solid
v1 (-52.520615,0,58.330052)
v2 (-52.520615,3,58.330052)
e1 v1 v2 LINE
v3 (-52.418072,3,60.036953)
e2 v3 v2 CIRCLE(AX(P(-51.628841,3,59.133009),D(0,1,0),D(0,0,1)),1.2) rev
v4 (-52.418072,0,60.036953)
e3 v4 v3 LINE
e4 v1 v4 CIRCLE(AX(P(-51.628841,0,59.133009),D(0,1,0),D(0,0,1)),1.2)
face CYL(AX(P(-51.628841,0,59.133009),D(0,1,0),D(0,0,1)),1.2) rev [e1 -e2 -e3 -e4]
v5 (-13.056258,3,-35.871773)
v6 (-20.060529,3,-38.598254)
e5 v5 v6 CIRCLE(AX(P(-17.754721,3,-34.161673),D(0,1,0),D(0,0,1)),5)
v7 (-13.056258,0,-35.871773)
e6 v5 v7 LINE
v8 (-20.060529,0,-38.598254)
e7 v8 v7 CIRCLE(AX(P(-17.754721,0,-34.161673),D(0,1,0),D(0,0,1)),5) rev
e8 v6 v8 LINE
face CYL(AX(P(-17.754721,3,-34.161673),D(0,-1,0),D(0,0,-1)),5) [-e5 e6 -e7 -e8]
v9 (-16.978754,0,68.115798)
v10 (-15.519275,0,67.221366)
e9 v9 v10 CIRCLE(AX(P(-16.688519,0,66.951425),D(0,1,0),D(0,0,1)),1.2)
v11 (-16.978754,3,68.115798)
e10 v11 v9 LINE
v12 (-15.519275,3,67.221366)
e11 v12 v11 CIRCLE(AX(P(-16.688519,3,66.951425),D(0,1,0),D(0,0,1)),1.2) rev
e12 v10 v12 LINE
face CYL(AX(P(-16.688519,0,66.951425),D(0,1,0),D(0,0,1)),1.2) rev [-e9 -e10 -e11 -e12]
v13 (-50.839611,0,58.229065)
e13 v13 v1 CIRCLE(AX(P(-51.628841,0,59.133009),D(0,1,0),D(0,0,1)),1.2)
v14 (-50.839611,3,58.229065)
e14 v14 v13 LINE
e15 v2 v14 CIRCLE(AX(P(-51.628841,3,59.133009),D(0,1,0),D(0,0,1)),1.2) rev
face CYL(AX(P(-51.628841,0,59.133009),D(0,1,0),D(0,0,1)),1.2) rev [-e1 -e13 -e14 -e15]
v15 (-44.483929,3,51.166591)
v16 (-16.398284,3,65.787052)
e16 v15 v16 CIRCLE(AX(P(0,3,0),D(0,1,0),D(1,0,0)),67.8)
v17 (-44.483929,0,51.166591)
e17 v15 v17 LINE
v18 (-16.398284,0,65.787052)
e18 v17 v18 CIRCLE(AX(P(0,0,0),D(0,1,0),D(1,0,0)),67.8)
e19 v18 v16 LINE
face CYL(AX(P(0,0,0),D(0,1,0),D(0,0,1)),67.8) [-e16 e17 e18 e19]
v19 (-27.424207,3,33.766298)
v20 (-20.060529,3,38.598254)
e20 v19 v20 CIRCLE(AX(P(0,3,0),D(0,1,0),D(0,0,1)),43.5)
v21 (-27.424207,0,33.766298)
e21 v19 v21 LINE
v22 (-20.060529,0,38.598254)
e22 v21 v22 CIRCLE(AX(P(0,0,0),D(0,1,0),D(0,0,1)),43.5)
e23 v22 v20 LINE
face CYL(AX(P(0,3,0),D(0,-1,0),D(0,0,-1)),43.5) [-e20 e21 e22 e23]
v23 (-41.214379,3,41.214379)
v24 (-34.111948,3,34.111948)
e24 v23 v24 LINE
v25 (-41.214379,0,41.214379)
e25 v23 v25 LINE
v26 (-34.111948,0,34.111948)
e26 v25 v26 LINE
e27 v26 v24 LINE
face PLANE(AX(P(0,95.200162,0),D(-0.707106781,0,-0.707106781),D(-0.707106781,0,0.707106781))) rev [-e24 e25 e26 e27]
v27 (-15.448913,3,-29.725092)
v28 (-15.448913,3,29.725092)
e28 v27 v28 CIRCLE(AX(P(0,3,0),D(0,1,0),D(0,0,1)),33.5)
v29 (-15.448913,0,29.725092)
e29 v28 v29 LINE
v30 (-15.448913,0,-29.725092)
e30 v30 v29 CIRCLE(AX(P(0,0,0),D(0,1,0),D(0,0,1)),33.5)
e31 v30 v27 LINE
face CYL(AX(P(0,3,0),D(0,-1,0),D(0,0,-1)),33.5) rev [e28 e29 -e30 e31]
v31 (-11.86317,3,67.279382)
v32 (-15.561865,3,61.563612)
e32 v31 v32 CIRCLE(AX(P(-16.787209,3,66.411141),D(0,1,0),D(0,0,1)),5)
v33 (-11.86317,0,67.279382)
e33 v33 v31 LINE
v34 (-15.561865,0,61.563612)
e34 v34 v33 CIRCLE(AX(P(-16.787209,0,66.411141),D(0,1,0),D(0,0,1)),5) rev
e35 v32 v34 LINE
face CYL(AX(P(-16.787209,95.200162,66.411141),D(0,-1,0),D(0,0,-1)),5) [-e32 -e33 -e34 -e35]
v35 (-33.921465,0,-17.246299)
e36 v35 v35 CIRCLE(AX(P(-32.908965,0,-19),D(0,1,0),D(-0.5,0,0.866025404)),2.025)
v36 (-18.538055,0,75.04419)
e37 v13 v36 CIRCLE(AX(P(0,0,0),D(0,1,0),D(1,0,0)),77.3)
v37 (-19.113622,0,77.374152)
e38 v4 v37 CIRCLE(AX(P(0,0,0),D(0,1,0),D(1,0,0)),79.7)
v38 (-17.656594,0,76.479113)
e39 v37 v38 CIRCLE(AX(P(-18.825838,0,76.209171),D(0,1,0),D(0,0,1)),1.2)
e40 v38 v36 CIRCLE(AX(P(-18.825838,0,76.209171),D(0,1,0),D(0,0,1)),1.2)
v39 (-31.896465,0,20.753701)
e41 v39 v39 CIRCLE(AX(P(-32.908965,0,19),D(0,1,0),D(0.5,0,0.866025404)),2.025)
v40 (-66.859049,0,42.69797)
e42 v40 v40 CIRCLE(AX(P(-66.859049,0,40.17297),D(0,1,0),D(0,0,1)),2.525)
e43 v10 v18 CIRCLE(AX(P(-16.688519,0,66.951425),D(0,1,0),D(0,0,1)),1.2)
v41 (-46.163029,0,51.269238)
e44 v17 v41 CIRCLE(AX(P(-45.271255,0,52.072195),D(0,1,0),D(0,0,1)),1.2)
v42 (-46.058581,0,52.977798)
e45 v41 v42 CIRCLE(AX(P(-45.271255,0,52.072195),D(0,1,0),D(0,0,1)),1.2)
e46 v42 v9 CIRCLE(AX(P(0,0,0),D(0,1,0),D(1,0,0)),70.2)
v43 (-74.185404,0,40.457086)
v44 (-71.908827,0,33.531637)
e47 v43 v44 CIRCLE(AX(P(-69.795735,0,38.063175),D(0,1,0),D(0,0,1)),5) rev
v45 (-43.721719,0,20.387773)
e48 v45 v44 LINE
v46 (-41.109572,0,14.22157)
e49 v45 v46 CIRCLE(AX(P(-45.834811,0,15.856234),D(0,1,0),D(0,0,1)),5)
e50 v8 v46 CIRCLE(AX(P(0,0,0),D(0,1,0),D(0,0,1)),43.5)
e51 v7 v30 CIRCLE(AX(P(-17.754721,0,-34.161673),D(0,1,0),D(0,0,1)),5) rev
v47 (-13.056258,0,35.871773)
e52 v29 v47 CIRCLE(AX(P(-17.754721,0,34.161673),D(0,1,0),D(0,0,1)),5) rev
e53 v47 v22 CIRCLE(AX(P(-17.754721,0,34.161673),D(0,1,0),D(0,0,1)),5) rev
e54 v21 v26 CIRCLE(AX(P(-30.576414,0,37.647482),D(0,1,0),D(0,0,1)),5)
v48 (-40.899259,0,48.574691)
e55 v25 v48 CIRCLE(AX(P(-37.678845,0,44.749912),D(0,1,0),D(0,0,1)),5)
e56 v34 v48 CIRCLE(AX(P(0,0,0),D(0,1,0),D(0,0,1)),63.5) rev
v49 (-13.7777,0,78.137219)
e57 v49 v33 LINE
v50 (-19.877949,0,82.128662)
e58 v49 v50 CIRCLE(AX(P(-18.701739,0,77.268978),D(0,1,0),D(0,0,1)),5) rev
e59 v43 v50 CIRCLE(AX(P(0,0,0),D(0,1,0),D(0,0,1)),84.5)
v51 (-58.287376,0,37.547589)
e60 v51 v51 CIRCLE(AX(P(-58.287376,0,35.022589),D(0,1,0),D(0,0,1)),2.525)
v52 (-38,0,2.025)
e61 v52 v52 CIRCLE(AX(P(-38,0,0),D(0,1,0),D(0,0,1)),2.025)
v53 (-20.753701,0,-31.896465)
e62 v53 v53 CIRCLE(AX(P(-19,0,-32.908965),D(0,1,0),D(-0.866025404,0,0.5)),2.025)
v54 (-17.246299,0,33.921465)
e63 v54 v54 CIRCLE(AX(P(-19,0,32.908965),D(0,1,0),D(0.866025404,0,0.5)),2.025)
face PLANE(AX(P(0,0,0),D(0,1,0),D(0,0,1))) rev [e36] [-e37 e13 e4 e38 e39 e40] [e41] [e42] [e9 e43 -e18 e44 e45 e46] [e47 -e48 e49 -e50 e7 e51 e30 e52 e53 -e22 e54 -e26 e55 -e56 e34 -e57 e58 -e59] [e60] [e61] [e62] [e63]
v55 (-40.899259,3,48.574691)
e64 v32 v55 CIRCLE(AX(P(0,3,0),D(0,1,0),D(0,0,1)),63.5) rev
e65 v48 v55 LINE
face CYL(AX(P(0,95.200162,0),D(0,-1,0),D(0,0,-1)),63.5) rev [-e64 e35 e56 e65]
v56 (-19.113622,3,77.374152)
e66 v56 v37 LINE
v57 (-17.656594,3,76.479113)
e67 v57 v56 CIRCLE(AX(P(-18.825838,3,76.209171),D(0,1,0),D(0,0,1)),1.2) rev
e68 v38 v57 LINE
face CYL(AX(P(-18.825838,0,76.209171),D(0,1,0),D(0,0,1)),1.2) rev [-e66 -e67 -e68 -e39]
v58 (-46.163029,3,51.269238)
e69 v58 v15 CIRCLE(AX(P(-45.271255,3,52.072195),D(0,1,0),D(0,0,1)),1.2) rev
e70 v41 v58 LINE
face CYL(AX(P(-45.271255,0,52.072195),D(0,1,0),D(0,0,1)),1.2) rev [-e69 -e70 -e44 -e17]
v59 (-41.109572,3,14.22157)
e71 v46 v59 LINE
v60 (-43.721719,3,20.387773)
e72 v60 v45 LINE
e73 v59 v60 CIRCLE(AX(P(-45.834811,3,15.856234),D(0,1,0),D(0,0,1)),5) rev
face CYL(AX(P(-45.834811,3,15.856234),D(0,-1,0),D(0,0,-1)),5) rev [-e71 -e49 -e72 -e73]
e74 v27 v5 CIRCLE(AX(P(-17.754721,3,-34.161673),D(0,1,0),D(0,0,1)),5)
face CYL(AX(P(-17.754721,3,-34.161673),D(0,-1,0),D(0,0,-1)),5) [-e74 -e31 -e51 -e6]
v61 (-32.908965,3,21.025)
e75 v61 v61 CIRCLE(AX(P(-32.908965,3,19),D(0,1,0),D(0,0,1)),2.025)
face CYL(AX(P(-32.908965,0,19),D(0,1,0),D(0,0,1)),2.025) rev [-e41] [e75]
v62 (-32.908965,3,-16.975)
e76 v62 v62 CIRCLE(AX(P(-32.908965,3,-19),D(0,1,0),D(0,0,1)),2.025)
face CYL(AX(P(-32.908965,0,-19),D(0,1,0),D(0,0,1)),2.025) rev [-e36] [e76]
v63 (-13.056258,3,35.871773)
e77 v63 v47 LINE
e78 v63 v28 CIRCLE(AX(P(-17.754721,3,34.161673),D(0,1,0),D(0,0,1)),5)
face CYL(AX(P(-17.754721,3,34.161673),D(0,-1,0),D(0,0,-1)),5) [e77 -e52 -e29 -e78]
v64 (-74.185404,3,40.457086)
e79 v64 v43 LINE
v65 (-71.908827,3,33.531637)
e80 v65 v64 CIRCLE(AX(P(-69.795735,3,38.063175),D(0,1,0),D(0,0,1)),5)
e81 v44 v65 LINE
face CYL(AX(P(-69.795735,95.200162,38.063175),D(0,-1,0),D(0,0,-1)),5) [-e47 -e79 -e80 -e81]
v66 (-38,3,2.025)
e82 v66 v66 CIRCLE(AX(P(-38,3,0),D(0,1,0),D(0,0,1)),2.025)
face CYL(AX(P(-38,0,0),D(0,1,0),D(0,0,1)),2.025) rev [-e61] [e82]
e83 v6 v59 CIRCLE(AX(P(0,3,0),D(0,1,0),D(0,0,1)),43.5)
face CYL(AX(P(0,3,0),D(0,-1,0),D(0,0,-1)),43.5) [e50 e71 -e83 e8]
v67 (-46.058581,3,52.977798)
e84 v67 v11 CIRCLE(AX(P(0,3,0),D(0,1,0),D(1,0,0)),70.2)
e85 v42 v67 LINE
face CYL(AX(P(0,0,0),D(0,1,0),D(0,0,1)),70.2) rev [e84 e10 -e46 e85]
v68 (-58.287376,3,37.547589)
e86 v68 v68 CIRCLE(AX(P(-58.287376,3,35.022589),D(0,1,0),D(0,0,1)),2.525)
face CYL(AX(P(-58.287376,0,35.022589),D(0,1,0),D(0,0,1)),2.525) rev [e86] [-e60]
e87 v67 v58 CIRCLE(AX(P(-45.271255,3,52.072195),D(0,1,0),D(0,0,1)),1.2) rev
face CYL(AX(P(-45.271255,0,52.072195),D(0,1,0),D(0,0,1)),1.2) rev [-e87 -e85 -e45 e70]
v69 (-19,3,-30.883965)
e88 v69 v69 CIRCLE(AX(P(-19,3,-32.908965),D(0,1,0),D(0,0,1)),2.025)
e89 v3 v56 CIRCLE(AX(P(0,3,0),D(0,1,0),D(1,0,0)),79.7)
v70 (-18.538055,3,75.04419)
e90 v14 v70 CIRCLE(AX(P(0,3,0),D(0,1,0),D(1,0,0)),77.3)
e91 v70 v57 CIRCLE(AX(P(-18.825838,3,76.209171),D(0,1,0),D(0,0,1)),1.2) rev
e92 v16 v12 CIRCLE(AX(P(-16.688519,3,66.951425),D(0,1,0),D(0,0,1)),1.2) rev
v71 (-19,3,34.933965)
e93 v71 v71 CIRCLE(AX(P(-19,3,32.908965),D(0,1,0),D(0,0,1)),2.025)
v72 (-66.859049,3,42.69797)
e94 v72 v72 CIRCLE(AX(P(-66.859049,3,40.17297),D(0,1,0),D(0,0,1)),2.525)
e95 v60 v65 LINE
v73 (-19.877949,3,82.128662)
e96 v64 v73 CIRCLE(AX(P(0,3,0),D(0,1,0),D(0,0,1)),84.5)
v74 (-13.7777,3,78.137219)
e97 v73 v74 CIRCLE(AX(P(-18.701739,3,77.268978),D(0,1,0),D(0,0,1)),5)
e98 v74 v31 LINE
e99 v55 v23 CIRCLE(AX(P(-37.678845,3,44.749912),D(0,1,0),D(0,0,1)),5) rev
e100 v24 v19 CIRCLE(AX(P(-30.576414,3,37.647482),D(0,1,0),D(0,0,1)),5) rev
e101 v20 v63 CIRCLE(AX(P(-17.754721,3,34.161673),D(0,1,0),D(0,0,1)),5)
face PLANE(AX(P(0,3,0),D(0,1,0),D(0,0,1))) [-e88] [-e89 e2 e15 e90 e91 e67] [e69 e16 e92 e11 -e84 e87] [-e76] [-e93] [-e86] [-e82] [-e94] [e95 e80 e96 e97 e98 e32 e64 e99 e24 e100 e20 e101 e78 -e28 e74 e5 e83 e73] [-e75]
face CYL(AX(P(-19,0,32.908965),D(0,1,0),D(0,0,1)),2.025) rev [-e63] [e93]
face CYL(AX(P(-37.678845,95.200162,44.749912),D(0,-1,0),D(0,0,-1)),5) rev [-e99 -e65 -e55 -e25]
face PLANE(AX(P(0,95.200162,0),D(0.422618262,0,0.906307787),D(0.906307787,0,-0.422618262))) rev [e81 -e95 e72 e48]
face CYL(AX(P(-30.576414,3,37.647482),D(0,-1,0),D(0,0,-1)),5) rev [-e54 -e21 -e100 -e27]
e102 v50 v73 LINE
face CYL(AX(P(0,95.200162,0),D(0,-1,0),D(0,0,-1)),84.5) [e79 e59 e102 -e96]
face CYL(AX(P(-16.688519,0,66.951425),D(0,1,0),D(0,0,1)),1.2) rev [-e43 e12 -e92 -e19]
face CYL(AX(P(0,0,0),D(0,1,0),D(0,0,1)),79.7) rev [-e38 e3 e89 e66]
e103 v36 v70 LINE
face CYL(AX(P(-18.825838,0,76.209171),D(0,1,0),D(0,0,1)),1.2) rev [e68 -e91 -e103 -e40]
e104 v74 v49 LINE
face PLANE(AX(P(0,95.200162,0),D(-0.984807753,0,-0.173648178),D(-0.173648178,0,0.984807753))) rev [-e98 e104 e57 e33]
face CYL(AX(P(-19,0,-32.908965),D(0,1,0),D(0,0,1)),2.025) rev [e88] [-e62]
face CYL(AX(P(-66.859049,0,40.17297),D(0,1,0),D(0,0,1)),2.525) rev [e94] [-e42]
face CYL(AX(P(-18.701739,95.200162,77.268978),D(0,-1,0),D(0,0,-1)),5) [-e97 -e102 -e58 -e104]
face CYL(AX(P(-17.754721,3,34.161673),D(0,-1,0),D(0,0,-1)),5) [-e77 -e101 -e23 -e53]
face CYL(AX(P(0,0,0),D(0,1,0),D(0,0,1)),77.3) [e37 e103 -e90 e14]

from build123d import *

# Parameters (mm, degrees)
SKETCH1_R               = 43.5
SKETCH1_R_2             = 33.5
BOSS_EXTRUDE1_DEPTH     = 3
SKETCH3_R               = 2.025
CUT_EXTRUDE2_DEPTH      = 62.591395503
CIRPATTERN1_COUNT       = 12
CUT_EXTRUDE1_DEPTH      = 62.591395503
BOSS_EXTRUDE2_DEPTH     = 3
CUT_EXTRUDE_THIN1_DEPTH = 3
FILLET1_R               = 1.2
FILLET2_R               = 5
CUT_EXTRUDE3_DEPTH      = 112.227677485
CUT_EXTRUDE3_DEPTH_BACK = 112.227677485
SKETCH6_R               = 2.525


with BuildPart() as part:
    # Sketch1 → Boss-Extrude1 (new body)
    with BuildSketch(Plane(origin=(0, 0, 0), x_dir=(1, 0, 0), z_dir=(0, 1, 0))):
        with Locations(Location((0, 0, 0), (0, 0, 270))):
            Circle(SKETCH1_R)
        with Locations(Location((0, 0, 0), (0, 0, 270))):
            Circle(SKETCH1_R_2, mode=Mode.SUBTRACT)
    extrude(amount=BOSS_EXTRUDE1_DEPTH)

    # Sketch3 → Cut-Extrude2 (cut, symmetric)
    with BuildSketch(Plane(origin=(0, 3, 0), x_dir=(1, 0, 0), z_dir=(0, 1, 0))):
        with Locations(Location((-38, 0, 0), (0, 0, 270))):
            Circle(SKETCH3_R)
    cut_extrude2 = extrude(amount=CUT_EXTRUDE2_DEPTH, both=True, mode=Mode.SUBTRACT)

    # CirPattern1: Cut-Extrude2 ×12 about axis
    cirpattern1_axis = Axis((0, 0, 0), (0, 1, 0))
    for i in range(1, CIRPATTERN1_COUNT):
        add(cut_extrude2.rotate(cirpattern1_axis, i * 360 / CIRPATTERN1_COUNT), mode=Mode.SUBTRACT)

    # Sketch2 → Cut-Extrude1 (cut, symmetric)
    with BuildSketch(Plane(origin=(0, 3, 0), x_dir=(1, 0, 0), z_dir=(0, 1, 0))):
        with BuildLine():
            Line((0, 0), (43.5, 0))
            ThreePointArc((43.5, 0), (24.950574981, -35.633113927), (-14.877876235, -40.876629004))
            Line((-14.877876235, -40.876629004), (0, 0))
        make_face()
    cut_extrude1 = extrude(amount=CUT_EXTRUDE1_DEPTH, both=True, mode=Mode.SUBTRACT)

    # Mirror1: Cut-Extrude1 across plane
    add(cut_extrude1.mirror(Plane.XY), mode=Mode.SUBTRACT)

    # Sketch4 → Boss-Extrude2 (add)
    with BuildSketch(Plane(origin=(0, 0, 0), x_dir=(1, 0, 0), z_dir=(0, 1, 0))):
        with BuildLine():
            ThreePointArc((-30.759144982, -30.759144982), (-35.633113927, -24.950574981), (-39.424388736, -18.383894386))
            Line((-39.424388736, -18.383894386), (-57.550544477, -26.836259621))
            Line((-57.550544477, -26.836259621), (-76.583008005, -35.711243117))
            ThreePointArc((-76.583008005, -35.711243117), (-51.440340751, -67.038357255), (-14.673271013, -83.21625513))
            Line((-14.673271013, -83.21625513), (-11.026659282, -62.535292316))
            ThreePointArc((-11.026659282, -62.535292316), (-29.32103694, -56.325187907), (-44.901280605, -44.901280605))
            Line((-44.901280605, -44.901280605), (-30.759144982, -30.759144982))
        make_face()
    extrude(amount=BOSS_EXTRUDE2_DEPTH)

    # Sketch5 → Cut-Extrude-Thin1 (cut)
    with BuildSketch(Plane(origin=(0, 3, 0), x_dir=(1, 0, 0), z_dir=(0, 1, 0))):
        with BuildLine():
            ThreePointArc((-46.972968566, -52.168766749), (-32.414752649, -62.268160489), (-15.791564015, -68.400778548))
            Line((-15.791564015, -68.400778548), (-15.251681485, -66.062290392))
            ThreePointArc((-15.251681485, -66.062290392), (-31.306555977, -60.139334489), (-45.367055111, -50.385219167))
            Line((-45.367055111, -50.385219167), (-46.972968566, -52.168766749))
        make_face()
        with BuildLine():
            ThreePointArc((-53.329709327, -59.228642591), (-36.801364475, -70.694763404), (-17.928599031, -77.657294163))
            Line((-17.928599031, -77.657294163), (-17.388716501, -75.318806008))
            ThreePointArc((-17.388716501, -75.318806008), (-35.693167803, -68.565937405), (-51.723795872, -57.445095009))
            Line((-51.723795872, -57.445095009), (-53.329709327, -59.228642591))
        make_face()
    extrude(amount=-CUT_EXTRUDE_THIN1_DEPTH, mode=Mode.SUBTRACT)

    # Fillet1
    fillet1_edges = [part.edges().sort_by_distance(p)[0] for p in [
        (-46.972968566, 1.5, 52.168766749),
        (-53.329709327, 1.5, 59.228642591),
        (-45.367055111, 1.5, 50.385219167),
        (-51.723795872, 1.5, 57.445095009),
        (-15.251681485, 1.5, 66.062290392),
        (-17.388716501, 1.5, 75.318806008),
        (-15.791564015, 1.5, 68.400778548),
        (-17.928599031, 1.5, 77.657294163),
    ]]
    fillet(fillet1_edges, radius=FILLET1_R - 0.0001)  # a hair under: the kernel refuses the full size

    # Fillet2
    fillet2_edges = [part.edges().sort_by_distance(p)[0] for p in [
        (-14.877876235, 1.5, -40.876629004),
        (-11.457674801, 1.5, -31.479702796),
        (-11.457674801, 1.5, 31.479702796),
        (-14.877876235, 1.5, 40.876629004),
        (-39.424388736, 1.5, 18.383894386),
        (-76.583008005, 1.5, 35.711243117),
        (-14.673271013, 1.5, 83.21625513),
        (-11.026659282, 1.5, 62.535292316),
        (-30.759144982, 1.5, 30.759144982),
        (-44.901280605, 1.5, 44.901280605),
    ]]
    fillet(fillet2_edges, radius=FILLET2_R - 0.0001)  # a hair under: the kernel refuses the full size

    # Sketch6 → Cut-Extrude3 (cut, two sides: drawn at the far end of the back side and taken through both)
    with BuildSketch(Plane(origin=(0, 3, 0), x_dir=(1, 0, 0), z_dir=(0, 1, 0)).offset(-CUT_EXTRUDE3_DEPTH_BACK)):
        with Locations(Location((-58.287376448, -35.022589094, 0), (0, 0, 270))):
            Circle(SKETCH6_R)
        with Locations(Location((-66.859049455, -40.172969843, 0), (0, 0, 270))):
            Circle(SKETCH6_R)
    extrude(amount=CUT_EXTRUDE3_DEPTH + CUT_EXTRUDE3_DEPTH_BACK, mode=Mode.SUBTRACT)


solid = part.part
